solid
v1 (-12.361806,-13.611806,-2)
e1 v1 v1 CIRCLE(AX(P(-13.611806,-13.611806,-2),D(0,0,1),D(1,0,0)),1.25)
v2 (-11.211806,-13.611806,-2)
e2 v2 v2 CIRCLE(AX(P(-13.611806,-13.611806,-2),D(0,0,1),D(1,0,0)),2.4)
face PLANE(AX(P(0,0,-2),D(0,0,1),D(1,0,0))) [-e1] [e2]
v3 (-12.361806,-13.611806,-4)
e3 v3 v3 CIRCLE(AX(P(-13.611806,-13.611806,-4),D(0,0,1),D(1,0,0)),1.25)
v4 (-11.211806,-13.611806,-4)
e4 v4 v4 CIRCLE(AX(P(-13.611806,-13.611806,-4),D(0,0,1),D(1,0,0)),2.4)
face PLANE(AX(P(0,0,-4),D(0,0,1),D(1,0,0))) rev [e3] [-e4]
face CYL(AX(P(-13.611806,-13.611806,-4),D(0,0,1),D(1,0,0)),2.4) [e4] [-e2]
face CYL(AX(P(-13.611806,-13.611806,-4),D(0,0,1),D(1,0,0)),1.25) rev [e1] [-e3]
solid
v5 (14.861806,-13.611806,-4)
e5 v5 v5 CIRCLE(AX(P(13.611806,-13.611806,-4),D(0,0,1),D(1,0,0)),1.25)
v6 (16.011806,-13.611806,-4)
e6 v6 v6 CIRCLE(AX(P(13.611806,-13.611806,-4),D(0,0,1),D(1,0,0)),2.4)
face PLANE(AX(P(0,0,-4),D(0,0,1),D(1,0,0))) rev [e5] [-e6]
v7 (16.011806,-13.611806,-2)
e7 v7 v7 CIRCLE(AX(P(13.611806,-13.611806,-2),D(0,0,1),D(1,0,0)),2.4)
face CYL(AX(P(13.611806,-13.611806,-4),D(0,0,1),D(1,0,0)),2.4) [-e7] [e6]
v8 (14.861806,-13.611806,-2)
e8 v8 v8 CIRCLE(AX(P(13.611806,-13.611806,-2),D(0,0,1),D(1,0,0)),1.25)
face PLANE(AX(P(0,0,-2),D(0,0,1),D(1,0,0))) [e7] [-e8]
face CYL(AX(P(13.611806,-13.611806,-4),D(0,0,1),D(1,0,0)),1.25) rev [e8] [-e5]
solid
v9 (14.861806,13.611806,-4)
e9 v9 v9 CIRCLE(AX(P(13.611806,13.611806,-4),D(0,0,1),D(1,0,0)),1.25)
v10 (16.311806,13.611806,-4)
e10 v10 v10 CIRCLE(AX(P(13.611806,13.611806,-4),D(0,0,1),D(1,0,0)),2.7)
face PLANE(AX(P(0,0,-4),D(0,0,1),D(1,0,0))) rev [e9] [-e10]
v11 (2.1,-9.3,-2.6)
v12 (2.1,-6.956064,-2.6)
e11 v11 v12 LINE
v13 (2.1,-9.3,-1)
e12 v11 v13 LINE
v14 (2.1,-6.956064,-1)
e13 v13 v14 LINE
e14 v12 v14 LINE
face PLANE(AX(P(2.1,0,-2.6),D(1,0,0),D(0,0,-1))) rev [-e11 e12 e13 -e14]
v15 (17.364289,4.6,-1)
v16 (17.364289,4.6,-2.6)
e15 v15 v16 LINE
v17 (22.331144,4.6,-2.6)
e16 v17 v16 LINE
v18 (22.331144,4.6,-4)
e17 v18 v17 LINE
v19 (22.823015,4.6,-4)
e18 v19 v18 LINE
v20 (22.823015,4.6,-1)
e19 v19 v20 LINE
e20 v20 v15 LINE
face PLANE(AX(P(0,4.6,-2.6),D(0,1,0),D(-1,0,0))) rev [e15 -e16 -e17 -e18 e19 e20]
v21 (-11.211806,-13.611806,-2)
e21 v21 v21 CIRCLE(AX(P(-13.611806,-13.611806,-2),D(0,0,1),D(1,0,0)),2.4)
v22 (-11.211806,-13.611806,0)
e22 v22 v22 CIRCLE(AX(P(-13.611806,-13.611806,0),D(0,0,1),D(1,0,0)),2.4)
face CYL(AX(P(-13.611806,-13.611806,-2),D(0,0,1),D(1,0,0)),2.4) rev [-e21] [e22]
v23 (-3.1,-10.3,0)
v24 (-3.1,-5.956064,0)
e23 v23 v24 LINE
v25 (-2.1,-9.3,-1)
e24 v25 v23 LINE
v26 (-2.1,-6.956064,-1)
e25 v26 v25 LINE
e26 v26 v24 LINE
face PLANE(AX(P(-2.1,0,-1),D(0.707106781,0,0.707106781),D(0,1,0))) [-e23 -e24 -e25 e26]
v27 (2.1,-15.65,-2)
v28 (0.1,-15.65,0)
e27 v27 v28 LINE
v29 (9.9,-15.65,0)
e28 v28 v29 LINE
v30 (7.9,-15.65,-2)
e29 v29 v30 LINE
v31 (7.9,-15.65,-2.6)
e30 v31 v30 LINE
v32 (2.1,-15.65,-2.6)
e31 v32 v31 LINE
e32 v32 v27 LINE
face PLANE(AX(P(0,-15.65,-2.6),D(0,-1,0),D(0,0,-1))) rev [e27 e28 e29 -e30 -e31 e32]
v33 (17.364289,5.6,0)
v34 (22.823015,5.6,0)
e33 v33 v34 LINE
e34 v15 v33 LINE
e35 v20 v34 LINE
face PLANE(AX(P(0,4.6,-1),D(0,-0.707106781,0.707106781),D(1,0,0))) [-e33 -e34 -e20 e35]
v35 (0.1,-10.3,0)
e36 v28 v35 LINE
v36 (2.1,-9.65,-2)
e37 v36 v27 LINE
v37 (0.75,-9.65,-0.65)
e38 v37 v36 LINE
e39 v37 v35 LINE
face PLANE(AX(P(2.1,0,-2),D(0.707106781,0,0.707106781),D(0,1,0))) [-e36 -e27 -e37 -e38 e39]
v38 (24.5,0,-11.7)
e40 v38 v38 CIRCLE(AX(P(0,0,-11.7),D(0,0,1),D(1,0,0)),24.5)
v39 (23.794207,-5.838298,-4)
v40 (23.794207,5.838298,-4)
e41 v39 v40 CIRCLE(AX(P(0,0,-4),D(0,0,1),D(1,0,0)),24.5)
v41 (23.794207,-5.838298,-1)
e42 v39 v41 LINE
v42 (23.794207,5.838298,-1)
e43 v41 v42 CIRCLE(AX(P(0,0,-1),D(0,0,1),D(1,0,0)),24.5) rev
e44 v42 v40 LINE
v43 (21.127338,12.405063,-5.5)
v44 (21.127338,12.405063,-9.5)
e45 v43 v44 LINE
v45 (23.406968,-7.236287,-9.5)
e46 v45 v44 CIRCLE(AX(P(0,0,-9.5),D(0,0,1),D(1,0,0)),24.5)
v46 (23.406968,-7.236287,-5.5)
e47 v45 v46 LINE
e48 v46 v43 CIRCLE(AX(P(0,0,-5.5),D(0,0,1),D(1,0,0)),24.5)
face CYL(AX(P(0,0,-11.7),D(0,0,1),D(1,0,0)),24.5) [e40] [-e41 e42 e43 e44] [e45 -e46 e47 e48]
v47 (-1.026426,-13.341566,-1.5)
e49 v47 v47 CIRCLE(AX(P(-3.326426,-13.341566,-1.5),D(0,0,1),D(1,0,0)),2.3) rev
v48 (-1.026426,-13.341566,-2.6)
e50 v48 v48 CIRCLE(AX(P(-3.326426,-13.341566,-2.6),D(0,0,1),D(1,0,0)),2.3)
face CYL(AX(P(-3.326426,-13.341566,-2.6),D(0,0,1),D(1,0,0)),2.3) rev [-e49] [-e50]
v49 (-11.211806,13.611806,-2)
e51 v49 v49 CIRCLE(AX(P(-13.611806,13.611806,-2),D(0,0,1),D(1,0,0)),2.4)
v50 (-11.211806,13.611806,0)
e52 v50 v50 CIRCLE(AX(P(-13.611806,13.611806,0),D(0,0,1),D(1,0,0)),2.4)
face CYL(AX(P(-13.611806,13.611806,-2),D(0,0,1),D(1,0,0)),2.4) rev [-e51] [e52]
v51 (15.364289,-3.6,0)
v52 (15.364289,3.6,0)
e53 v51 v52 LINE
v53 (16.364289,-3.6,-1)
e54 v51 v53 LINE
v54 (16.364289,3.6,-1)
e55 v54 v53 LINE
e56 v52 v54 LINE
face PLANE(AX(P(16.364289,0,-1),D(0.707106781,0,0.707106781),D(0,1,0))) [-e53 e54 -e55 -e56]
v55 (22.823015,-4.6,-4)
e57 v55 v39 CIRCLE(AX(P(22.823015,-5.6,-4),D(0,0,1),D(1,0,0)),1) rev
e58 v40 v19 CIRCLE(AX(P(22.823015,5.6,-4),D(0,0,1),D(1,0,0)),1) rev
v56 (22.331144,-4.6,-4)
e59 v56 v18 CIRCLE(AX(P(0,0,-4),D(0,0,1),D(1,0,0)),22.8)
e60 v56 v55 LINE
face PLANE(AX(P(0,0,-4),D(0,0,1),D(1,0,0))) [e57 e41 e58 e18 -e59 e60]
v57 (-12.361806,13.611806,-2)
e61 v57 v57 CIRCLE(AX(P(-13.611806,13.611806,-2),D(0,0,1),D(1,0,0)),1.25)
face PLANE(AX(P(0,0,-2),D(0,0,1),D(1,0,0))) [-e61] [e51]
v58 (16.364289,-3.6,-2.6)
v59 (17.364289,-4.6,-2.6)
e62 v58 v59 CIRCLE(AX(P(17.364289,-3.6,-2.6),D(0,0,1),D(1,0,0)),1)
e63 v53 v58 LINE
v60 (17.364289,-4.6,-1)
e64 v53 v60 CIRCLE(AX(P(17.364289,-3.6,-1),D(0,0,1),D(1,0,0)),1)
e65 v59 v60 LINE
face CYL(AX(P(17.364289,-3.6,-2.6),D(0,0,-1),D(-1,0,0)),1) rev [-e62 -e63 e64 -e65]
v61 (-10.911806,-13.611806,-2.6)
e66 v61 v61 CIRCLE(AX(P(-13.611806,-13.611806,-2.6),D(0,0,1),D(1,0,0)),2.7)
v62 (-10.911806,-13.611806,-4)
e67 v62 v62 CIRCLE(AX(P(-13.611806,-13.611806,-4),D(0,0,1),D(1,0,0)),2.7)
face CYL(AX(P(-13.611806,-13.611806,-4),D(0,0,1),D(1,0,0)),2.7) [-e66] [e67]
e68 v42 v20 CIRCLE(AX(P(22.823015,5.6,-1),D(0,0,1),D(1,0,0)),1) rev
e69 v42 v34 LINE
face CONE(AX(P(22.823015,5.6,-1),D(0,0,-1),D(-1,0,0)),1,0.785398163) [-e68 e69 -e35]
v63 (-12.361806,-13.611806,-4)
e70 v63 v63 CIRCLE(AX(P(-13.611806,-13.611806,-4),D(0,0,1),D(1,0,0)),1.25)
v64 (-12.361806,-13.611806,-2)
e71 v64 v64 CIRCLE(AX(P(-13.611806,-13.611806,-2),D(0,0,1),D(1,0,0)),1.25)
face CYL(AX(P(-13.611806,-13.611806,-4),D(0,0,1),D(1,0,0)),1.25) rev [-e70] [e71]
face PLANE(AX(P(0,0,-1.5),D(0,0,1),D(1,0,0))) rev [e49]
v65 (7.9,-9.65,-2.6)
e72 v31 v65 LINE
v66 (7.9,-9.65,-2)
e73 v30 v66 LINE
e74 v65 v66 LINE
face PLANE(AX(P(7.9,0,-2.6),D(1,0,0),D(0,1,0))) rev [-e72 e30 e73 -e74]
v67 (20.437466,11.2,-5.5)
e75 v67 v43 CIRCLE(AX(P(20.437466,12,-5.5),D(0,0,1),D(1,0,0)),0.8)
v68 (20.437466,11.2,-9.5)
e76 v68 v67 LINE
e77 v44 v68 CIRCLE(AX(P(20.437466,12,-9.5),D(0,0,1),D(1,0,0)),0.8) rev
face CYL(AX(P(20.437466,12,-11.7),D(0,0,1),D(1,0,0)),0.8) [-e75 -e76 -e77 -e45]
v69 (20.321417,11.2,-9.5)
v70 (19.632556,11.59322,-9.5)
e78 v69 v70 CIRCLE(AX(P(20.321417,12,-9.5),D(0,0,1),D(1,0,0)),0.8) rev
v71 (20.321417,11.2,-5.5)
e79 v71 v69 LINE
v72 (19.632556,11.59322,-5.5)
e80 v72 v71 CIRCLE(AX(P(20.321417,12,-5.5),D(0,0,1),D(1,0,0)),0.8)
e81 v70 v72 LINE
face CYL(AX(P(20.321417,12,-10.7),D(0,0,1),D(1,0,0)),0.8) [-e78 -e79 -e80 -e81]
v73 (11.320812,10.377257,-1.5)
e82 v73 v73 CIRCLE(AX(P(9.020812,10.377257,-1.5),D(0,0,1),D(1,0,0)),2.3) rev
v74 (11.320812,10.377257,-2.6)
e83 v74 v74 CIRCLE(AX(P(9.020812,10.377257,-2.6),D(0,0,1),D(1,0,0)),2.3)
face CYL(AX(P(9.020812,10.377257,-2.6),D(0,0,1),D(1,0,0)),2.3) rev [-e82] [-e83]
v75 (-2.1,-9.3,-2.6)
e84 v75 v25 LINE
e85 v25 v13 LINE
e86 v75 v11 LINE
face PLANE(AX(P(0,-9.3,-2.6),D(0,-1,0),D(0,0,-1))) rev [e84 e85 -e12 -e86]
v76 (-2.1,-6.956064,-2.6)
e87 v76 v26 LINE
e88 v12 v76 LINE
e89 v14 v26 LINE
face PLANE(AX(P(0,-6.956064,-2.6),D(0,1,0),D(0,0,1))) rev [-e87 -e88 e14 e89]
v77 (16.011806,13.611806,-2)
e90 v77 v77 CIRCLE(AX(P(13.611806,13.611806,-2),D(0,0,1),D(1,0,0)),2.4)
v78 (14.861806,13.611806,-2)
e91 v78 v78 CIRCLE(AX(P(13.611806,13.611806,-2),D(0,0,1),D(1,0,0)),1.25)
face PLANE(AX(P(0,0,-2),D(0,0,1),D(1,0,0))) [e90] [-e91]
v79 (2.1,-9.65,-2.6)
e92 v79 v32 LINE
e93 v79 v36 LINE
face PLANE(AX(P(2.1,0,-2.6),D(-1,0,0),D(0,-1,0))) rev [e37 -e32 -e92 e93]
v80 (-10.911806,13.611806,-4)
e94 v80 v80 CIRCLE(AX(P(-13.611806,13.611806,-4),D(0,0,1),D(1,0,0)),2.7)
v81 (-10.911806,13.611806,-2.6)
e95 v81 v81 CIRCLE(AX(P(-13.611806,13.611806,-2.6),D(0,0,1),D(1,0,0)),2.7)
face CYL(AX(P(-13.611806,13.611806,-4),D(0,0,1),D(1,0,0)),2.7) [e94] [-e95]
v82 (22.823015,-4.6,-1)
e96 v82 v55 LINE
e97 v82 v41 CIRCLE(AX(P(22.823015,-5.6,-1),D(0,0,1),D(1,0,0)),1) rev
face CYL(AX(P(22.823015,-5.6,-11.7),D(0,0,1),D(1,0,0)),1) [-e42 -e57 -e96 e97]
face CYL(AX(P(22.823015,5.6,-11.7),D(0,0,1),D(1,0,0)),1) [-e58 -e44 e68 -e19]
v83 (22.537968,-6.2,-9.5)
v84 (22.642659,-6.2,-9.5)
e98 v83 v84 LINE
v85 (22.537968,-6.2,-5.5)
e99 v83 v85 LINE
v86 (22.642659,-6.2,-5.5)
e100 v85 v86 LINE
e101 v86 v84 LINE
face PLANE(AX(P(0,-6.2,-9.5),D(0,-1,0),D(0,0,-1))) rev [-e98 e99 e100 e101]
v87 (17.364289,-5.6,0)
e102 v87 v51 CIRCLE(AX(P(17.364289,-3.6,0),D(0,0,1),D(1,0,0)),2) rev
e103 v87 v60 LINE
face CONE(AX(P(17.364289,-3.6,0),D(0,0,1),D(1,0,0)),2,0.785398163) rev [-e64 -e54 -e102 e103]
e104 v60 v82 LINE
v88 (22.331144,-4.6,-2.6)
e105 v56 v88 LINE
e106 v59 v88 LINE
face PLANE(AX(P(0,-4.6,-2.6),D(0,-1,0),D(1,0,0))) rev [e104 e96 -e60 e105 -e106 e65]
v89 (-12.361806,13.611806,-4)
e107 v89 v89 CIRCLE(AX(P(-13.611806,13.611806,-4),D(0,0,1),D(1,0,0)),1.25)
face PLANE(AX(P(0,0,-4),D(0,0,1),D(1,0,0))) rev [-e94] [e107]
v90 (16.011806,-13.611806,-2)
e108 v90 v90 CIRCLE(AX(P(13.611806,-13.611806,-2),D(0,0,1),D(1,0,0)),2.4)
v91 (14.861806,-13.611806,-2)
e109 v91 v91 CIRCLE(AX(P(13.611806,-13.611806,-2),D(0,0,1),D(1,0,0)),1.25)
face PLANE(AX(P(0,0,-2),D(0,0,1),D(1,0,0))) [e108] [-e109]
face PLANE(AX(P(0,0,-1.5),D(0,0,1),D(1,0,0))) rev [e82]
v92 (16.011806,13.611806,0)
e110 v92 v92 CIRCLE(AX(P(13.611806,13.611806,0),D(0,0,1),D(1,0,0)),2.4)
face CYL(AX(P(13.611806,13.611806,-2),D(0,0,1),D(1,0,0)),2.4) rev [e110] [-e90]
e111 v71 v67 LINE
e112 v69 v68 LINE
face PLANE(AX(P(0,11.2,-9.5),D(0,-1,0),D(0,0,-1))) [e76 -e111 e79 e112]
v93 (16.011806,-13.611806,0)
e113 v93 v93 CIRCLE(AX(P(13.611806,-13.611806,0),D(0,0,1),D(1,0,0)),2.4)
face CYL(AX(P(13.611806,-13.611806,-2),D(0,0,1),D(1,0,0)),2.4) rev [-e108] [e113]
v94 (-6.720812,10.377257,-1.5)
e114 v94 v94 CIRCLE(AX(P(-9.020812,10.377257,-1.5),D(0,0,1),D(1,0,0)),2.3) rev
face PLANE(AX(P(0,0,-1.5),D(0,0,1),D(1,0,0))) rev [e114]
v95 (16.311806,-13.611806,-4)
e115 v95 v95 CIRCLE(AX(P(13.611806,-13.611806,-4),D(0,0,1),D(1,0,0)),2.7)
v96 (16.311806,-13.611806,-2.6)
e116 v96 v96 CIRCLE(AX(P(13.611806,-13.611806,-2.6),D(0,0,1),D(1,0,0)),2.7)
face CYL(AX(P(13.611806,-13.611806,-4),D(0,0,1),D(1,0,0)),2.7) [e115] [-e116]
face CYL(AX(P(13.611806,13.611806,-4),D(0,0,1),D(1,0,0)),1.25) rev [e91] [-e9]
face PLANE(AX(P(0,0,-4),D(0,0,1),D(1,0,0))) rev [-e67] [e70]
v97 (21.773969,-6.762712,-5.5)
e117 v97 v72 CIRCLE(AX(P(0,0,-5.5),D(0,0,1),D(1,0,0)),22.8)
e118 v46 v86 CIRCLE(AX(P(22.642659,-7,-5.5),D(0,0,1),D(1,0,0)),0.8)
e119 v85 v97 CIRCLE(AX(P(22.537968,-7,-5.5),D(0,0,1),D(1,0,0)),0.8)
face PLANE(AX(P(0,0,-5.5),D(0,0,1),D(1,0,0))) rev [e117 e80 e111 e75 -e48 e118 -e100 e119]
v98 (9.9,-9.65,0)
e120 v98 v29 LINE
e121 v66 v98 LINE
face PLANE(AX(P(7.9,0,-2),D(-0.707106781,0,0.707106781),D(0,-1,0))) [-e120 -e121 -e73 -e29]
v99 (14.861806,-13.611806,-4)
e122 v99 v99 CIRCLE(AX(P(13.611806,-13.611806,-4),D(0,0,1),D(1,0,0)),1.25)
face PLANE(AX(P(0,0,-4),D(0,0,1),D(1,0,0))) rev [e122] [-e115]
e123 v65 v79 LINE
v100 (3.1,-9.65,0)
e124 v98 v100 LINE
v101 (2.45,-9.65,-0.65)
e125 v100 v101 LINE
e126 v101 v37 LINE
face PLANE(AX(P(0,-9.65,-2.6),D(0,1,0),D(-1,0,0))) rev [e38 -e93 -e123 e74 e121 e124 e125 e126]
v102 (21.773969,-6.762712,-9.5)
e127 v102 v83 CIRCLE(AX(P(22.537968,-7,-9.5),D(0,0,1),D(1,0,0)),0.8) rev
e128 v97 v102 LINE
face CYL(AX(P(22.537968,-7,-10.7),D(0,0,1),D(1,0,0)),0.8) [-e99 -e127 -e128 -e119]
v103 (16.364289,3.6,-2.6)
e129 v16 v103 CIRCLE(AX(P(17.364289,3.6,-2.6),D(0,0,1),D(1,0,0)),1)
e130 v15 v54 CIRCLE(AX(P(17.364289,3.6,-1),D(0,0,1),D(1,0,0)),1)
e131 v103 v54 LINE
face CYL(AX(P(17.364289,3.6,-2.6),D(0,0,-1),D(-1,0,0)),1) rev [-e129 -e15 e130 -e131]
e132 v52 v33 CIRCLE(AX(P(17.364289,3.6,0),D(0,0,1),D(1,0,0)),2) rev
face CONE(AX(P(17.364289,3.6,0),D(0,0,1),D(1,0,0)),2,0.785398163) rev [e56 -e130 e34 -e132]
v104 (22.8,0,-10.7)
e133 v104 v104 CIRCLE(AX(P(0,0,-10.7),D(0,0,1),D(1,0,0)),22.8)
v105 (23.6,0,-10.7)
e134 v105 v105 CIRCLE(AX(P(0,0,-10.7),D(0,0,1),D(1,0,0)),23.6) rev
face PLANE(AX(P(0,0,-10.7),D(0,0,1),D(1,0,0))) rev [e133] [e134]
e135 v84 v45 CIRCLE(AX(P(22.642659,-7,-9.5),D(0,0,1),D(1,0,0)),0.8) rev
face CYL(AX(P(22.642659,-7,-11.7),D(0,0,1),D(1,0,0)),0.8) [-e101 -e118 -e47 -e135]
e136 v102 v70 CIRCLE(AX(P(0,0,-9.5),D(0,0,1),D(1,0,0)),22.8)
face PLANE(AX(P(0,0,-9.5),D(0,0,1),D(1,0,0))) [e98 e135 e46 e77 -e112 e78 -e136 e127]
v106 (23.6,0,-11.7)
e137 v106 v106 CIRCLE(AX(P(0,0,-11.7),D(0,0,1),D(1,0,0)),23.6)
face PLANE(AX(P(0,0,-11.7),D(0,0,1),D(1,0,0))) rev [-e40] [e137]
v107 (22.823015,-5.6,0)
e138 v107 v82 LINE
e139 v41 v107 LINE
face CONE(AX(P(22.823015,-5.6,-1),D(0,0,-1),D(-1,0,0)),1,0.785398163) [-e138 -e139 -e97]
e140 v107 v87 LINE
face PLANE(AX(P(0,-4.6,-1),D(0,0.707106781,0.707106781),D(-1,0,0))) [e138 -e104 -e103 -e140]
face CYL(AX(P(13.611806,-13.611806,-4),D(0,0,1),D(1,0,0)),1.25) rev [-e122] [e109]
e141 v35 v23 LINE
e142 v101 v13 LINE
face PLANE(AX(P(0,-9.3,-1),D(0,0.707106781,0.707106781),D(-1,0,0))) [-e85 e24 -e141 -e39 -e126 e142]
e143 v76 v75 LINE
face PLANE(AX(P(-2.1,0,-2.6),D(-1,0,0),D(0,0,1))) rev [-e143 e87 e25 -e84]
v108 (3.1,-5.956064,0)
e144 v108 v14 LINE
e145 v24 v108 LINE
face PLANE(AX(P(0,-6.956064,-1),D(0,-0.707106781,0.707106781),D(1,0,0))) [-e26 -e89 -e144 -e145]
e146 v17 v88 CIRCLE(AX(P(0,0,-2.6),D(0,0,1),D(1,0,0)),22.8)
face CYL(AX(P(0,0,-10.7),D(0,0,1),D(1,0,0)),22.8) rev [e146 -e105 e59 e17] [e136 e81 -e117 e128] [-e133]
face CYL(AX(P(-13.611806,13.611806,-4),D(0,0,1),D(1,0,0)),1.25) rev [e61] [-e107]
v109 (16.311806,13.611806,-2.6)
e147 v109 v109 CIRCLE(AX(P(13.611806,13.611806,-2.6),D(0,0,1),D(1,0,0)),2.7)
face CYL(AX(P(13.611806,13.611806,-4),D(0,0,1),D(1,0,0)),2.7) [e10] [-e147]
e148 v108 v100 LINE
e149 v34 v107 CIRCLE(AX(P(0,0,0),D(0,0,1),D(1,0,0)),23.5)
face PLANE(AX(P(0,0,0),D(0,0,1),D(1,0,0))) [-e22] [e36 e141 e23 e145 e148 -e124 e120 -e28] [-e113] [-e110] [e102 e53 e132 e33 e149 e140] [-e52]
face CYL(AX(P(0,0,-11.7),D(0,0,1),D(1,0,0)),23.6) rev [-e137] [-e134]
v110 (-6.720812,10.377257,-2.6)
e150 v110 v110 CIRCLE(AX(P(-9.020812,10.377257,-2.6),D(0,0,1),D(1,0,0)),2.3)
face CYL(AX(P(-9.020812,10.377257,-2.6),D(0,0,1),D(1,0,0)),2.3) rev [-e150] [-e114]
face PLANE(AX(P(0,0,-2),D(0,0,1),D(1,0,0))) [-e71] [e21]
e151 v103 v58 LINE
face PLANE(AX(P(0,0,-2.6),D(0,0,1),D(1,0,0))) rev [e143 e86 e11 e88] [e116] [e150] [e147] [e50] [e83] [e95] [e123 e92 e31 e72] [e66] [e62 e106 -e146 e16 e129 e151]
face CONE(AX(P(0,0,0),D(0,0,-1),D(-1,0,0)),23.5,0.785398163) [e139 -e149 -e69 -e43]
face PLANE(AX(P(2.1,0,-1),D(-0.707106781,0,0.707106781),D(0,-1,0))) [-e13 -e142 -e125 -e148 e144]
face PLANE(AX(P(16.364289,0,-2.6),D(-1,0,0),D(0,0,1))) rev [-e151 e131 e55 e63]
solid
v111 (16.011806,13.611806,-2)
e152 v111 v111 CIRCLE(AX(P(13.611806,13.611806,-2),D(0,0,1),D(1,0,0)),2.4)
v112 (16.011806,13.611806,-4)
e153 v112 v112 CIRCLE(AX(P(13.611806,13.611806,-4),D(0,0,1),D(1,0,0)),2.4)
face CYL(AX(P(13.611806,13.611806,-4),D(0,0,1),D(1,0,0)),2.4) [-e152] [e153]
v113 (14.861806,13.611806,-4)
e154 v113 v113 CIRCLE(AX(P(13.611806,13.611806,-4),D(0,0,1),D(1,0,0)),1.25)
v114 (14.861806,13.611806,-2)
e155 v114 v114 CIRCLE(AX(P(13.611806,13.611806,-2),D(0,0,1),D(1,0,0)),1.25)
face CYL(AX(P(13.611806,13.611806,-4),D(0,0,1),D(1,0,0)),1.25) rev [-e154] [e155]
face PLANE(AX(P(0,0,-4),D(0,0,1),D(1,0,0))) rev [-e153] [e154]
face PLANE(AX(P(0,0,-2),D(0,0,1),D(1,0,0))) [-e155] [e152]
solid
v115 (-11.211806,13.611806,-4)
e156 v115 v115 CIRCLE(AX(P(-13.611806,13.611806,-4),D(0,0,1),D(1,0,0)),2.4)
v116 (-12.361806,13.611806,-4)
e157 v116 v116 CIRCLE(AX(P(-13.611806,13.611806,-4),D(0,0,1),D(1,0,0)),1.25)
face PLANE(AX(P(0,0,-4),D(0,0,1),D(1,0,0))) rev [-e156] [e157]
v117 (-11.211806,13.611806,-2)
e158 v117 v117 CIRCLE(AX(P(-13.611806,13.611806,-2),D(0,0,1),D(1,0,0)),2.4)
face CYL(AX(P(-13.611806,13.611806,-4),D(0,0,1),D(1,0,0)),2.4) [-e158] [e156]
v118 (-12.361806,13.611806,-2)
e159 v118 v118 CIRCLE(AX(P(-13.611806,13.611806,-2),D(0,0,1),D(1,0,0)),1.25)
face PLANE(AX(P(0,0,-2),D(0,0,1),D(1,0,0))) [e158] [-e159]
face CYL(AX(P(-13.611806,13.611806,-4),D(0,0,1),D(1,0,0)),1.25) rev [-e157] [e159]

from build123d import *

# Parameters (mm, degrees)
SKETCH_2_R          = 24.5
SKETCH_2_R_2        = 23.6
EXTRUDE_3_DEPTH     = 11.7
SKETCH_2_5_R        = 23.6
SKETCH_2_5_R_2      = 22.8
EXTRUDE_4_DEPTH     = 10.7
SKETCH_2_6_R        = 2.7
SKETCH_2_6_R_2      = 2.3
SKETCH_2_6_W        = 5.8
SKETCH_2_6_H        = 6
SKETCH_2_6_W_2      = 4.2
SKETCH_2_6_H_2      = 2.343935591
EXTRUDE_5_DEPTH     = 2.6
SKETCH_2_7_R        = 2.4
SKETCH_2_7_R_2      = 1.25
EXTRUDE_6_DEPTH     = 4
EXTRUDE_6_2_DEPTH   = 4
EXTRUDE_6_3_DEPTH   = 4
EXTRUDE_6_4_DEPTH   = 4
SKETCH_2_20_R       = 2.3
EXTRUDE_10_DEPTH    = 1.5
SKETCH_2_9_R        = 2.7
SKETCH_2_9_R_2      = 1.25
SKETCH_2_9_R_3      = 2.4
EXTRUDE_7_DEPTH     = 4
CUT_EXTRUDE_2_DEPTH = 9.5
SKETCH_2_18_R       = 2.4
SKETCH_2_18_R_2     = 1.25
CUT_EXTRUDE_3_DEPTH = 2
SKETCH_2_14_R       = 24.5
SKETCH_2_14_R_2     = 22.8
EXTRUDE_9_DEPTH     = 5.5
CUT_EXTRUDE_4_DEPTH = 4
FILLET_2_R          = 0.8
FILLET_3_R          = 0.8
FILLET_4_R          = 0.8
FILLET_5_R          = 0.8
CHAMFER_1_SIZE      = 2
FILLET_6_R          = 1
CHAMFER_5_SIZE      = 1


with BuildPart() as part:
    # 草图2 → 凸台-拉伸3 (new body)
    with BuildSketch(Plane.XY):
        Circle(SKETCH_2_R)
        Circle(SKETCH_2_R_2, mode=Mode.SUBTRACT)
    extrude(amount=-EXTRUDE_3_DEPTH)

    # 草图2<5> → 凸台-拉伸4 (add)
    with BuildSketch(Plane.XY):
        Circle(SKETCH_2_5_R)
        Circle(SKETCH_2_5_R_2, mode=Mode.SUBTRACT)
    extrude(amount=-EXTRUDE_4_DEPTH)

    # 草图2<6> → 凸台-拉伸5 (add)
    with BuildSketch(Plane.XY):
        with BuildLine():
            Line((16.364288895, 4.6), (22.331144171, 4.6))
            ThreePointArc((22.331144171, 4.6), (21.351879352, 7.996077047), (19.85950654, 11.2))
            ThreePointArc((19.85950654, 11.2), (-22.638617972, -2.707946886), (21.940829519, -6.2))
            ThreePointArc((21.940829519, -6.2), (22.150438226, -5.403525366), (22.331144171, -4.6))
            Line((22.331144171, -4.6), (16.364288895, -4.6))
            Line((16.364288895, -4.6), (16.364288895, 4.6))
        make_face()
        with Locations((-13.611805538, -13.611805538)):
            Circle(SKETCH_2_6_R, mode=Mode.SUBTRACT)
        with Locations((-3.326426064, -13.341566236)):
            Circle(SKETCH_2_6_R_2, mode=Mode.SUBTRACT)
        with Locations((5, -12.65)):
            Rectangle(SKETCH_2_6_W, SKETCH_2_6_H, mode=Mode.SUBTRACT)
        with Locations((13.611805538, -13.611805538)):
            Circle(SKETCH_2_6_R, mode=Mode.SUBTRACT)
        with Locations((0, -8.128032205)):
            Rectangle(SKETCH_2_6_W_2, SKETCH_2_6_H_2, mode=Mode.SUBTRACT)
        with Locations((-9.020811649, 10.377256728)):
            Circle(SKETCH_2_6_R_2, mode=Mode.SUBTRACT)
        with Locations((-13.611805538, 13.611805538)):
            Circle(SKETCH_2_6_R, mode=Mode.SUBTRACT)
        with Locations((9.020811649, 10.377256728)):
            Circle(SKETCH_2_6_R_2, mode=Mode.SUBTRACT)
        with Locations((13.611805538, 13.611805538)):
            Circle(SKETCH_2_6_R, mode=Mode.SUBTRACT)
    extrude(amount=-EXTRUDE_5_DEPTH)

    # 草图2<20> → 凸台-拉伸10 (add)
    with BuildSketch(Plane.XY):
        with Locations((-9.020811649, 10.377256728)):
            Circle(SKETCH_2_20_R)
        with Locations((9.020811649, 10.377256728)):
            Circle(SKETCH_2_20_R)
        with Locations((-3.326426064, -13.341566236)):
            Circle(SKETCH_2_20_R)
    extrude(amount=-EXTRUDE_10_DEPTH)

    # 草图2<9> → 凸台-拉伸7 (add)
    # profile 1 of 8: a face of its own
    with BuildSketch(Plane.XY):
        with Locations((-13.611805538, 13.611805538)):
            Circle(SKETCH_2_9_R)
        with Locations((-13.611805538, 13.611805538)):
            Circle(SKETCH_2_9_R_2, mode=Mode.SUBTRACT)
    # profile 2 of 8: a face of its own
    with BuildSketch(Plane.XY):
        with Locations((13.611805538, 13.611805538)):
            Circle(SKETCH_2_9_R)
        with Locations((13.611805538, 13.611805538)):
            Circle(SKETCH_2_9_R_2, mode=Mode.SUBTRACT)
    # profile 3 of 8: a face of its own
    with BuildSketch(Plane.XY):
        with Locations((-13.611805538, 13.611805538)):
            Circle(SKETCH_2_9_R)
        with Locations((-13.611805538, 13.611805538)):
            Circle(SKETCH_2_9_R_3, mode=Mode.SUBTRACT)
    # profile 4 of 8: a face of its own
    with BuildSketch(Plane.XY):
        with Locations((13.611805538, 13.611805538)):
            Circle(SKETCH_2_9_R)
        with Locations((13.611805538, 13.611805538)):
            Circle(SKETCH_2_9_R_3, mode=Mode.SUBTRACT)
    # profile 5 of 8: a face of its own
    with BuildSketch(Plane.XY):
        with Locations((13.611805538, -13.611805538)):
            Circle(SKETCH_2_9_R)
        with Locations((13.611805538, -13.611805538)):
            Circle(SKETCH_2_9_R_3, mode=Mode.SUBTRACT)
    # profile 6 of 8: a face of its own
    with BuildSketch(Plane.XY):
        with Locations((-13.611805538, -13.611805538)):
            Circle(SKETCH_2_9_R)
        with Locations((-13.611805538, -13.611805538)):
            Circle(SKETCH_2_9_R_3, mode=Mode.SUBTRACT)
    # profile 7 of 8: a face of its own
    with BuildSketch(Plane.XY):
        with Locations((-13.611805538, -13.611805538)):
            Circle(SKETCH_2_9_R_3)
        with Locations((-13.611805538, -13.611805538)):
            Circle(SKETCH_2_9_R_2, mode=Mode.SUBTRACT)
    # profile 8 of 8: a face of its own
    with BuildSketch(Plane.XY):
        with Locations((13.611805538, -13.611805538)):
            Circle(SKETCH_2_9_R_3)
        with Locations((13.611805538, -13.611805538)):
            Circle(SKETCH_2_9_R_2, mode=Mode.SUBTRACT)
    extrude(amount=-EXTRUDE_7_DEPTH)

    # 草图2<13> → 切除-拉伸2 (cut)
    with BuildSketch(Plane.XY):
        with BuildLine():
            Line((21.790135383, 11.2), (19.85950654, 11.2))
            ThreePointArc((19.85950654, 11.2), (22.638617972, 2.707946886), (21.940829519, -6.2))
            Line((21.940829519, -6.2), (23.70253151, -6.2))
            ThreePointArc((23.70253151, -6.2), (24.353350596, 2.676623757), (21.790135383, 11.2))
        make_face()
    extrude(amount=-CUT_EXTRUDE_2_DEPTH, mode=Mode.SUBTRACT)


with BuildPart() as body_2:
    # 草图2<7> → 凸台-拉伸6 (new body)
    with BuildSketch(Plane.XY):
        with Locations((13.611805538, 13.611805538)):
            Circle(SKETCH_2_7_R)
        with Locations((13.611805538, 13.611805538)):
            Circle(SKETCH_2_7_R_2, mode=Mode.SUBTRACT)
    extrude(amount=-EXTRUDE_6_DEPTH)


with BuildPart() as body_3:
    # 草图2<7> → Extrude 6 2 (new body)
    with BuildSketch(Plane.XY):
        with Locations((-13.611805538, 13.611805538)):
            Circle(SKETCH_2_7_R)
        with Locations((-13.611805538, 13.611805538)):
            Circle(SKETCH_2_7_R_2, mode=Mode.SUBTRACT)
    extrude(amount=-EXTRUDE_6_2_DEPTH)


with BuildPart() as body_4:
    # 草图2<7> → Extrude 6 3 (new body)
    with BuildSketch(Plane.XY):
        with Locations((13.611805538, -13.611805538)):
            Circle(SKETCH_2_7_R)
        with Locations((13.611805538, -13.611805538)):
            Circle(SKETCH_2_7_R_2, mode=Mode.SUBTRACT)
    extrude(amount=-EXTRUDE_6_3_DEPTH)


with BuildPart() as body_5:
    # 草图2<7> → Extrude 6 4 (new body)
    with BuildSketch(Plane.XY):
        with Locations((-13.611805538, -13.611805538)):
            Circle(SKETCH_2_7_R)
        with Locations((-13.611805538, -13.611805538)):
            Circle(SKETCH_2_7_R_2, mode=Mode.SUBTRACT)
    extrude(amount=-EXTRUDE_6_4_DEPTH)


with BuildPart() as cut_extrude_3_tool:
    # 草图2<18> → 切除-拉伸3 (new body)
    # profile 1 of 4: a face of its own
    with BuildSketch(Plane.XY):
        with Locations((13.611805538, 13.611805538)):
            Circle(SKETCH_2_18_R)
        with Locations((13.611805538, 13.611805538)):
            Circle(SKETCH_2_18_R_2, mode=Mode.SUBTRACT)
    # profile 2 of 4: a face of its own
    with BuildSketch(Plane.XY):
        with Locations((13.611805538, -13.611805538)):
            Circle(SKETCH_2_18_R)
        with Locations((13.611805538, -13.611805538)):
            Circle(SKETCH_2_18_R_2, mode=Mode.SUBTRACT)
    # profile 3 of 4: a face of its own
    with BuildSketch(Plane.XY):
        with Locations((-13.611805538, -13.611805538)):
            Circle(SKETCH_2_18_R)
        with Locations((-13.611805538, -13.611805538)):
            Circle(SKETCH_2_18_R_2, mode=Mode.SUBTRACT)
    # profile 4 of 4: a face of its own
    with BuildSketch(Plane.XY):
        with Locations((-13.611805538, 13.611805538)):
            Circle(SKETCH_2_18_R)
        with Locations((-13.611805538, 13.611805538)):
            Circle(SKETCH_2_18_R_2, mode=Mode.SUBTRACT)
    extrude(amount=-CUT_EXTRUDE_3_DEPTH)


with BuildPart() as part_1:
    add(part.part)

    # 切除-拉伸3: cut by cut_extrude_3_tool
    add(cut_extrude_3_tool.part, mode=Mode.SUBTRACT)

    # 草图2<14> → 凸台-拉伸9 (add)
    with BuildSketch(Plane.XY):
        Circle(SKETCH_2_14_R)
        Circle(SKETCH_2_14_R_2, mode=Mode.SUBTRACT)
    extrude(amount=-EXTRUDE_9_DEPTH)

    # 草图2<19> → 切除-拉伸4 (cut)
    with BuildSketch(Plane.XY):
        with BuildLine():
            ThreePointArc((23.6, 0), (23.486565903, 2.311108411), (23.14735406, 4.6))
            Line((23.14735406, 4.6), (22.331144171, 4.6))
            ThreePointArc((22.331144171, 4.6), (22.682483188, 2.311916185), (22.8, 0))
            ThreePointArc((22.8, 0), (22.682483188, -2.311916185), (22.331144171, -4.6))
            Line((22.331144171, -4.6), (23.14735406, -4.6))
            ThreePointArc((23.14735406, -4.6), (23.486565903, -2.311108411), (23.6, 0))
        make_face()
        with BuildLine():
            ThreePointArc((24.5, 0), (24.390828993, 2.310294579), (24.064288895, 4.6))
            Line((24.064288895, 4.6), (23.14735406, 4.6))
            ThreePointArc((23.14735406, 4.6), (23.486565903, 2.311108411), (23.6, 0))
            ThreePointArc((23.6, 0), (23.486565903, -2.311108411), (23.14735406, -4.6))
            Line((23.14735406, -4.6), (24.064288895, -4.6))
            ThreePointArc((24.064288895, -4.6), (24.390828993, -2.310294579), (24.5, 0))
        make_face()
    extrude(amount=-CUT_EXTRUDE_4_DEPTH, mode=Mode.SUBTRACT)

    # 圆角2
    fillet_2_edges = [part_1.edges().sort_by_distance(p)[0] for p in [
        (21.790135383, 11.2, -7.5),
    ]]
    fillet(fillet_2_edges, radius=FILLET_2_R)

    # 圆角3
    fillet_3_edges = [part_1.edges().sort_by_distance(p)[0] for p in [
        (23.70253151, -6.2, -7.5),
    ]]
    fillet(fillet_3_edges, radius=FILLET_3_R)

    # 圆角4
    fillet_4_edges = [part_1.edges().sort_by_distance(p)[0] for p in [
        (21.940829519, -6.2, -7.5),
    ]]
    fillet(fillet_4_edges, radius=FILLET_4_R)

    # 圆角5
    fillet_5_edges = [part_1.edges().sort_by_distance(p)[0] for p in [
        (19.85950654, 11.2, -7.5),
    ]]
    fillet(fillet_5_edges, radius=FILLET_5_R)

    # 倒角1
    chamfer_1_edges = [part_1.edges().sort_by_distance(p)[0] for p in [
        (2.1, -12.65, 0),
        (7.9, -12.65, 0),
    ]]
    chamfer(chamfer_1_edges, length=CHAMFER_1_SIZE)

    # 倒角4
    # the kernel refuses this chamfer: 1 mm, written as the material it takes off along each edge
    with BuildSketch(Plane(origin=(-2.1, -6.956064409, 0), x_dir=(0, 0.9996219169112968, 0.027495876610586365), z_dir=(1, 0, 0)), Plane(origin=(2.1, -9.3, 0), x_dir=(0, -0.9996219169112968, 0.02749587661058639), z_dir=(-1, 0, 0))) as chamfer_4_piece_1:
        with BuildLine():
            Line((1.028673195, 0), (-0.056547155, -1.027117794))
            Line((-0.056547155, -1.027117794), (-0.076539593, -1.026567876))
            ThreePointArc((-0.076539593, -1.026567876), (-0.034129227, -0.51339783), (-0.019992438, 0.000549918))
            Line((-0.019992438, 0.000549918), (0.000549918, 0.019992438))
            ThreePointArc((0.000549918, 0.019992438), (0.514497665, 0.00585565), (1.029223113, 0.019992438))
            Line((1.029223113, 0.019992438), (1.028673195, 0))
        make_face()
    extrude(amount=4.2, mode=Mode.SUBTRACT)
    with BuildSketch(Plane(origin=(-2.1, -9.3, 0), x_dir=(-0.9996219169112968, 0, 0.027495876610586365), z_dir=(0, 1, 0)), Plane(origin=(2.1, -6.956064409, 0), x_dir=(0.9996219169112968, 0, 0.027495876610586365), z_dir=(0, -1, 0))) as chamfer_4_piece_2:
        with BuildLine():
            Line((1.028673195, 0), (-0.056547155, -1.027117794))
            Line((-0.056547155, -1.027117794), (-0.076539593, -1.026567876))
            ThreePointArc((-0.076539593, -1.026567876), (-0.034129227, -0.51339783), (-0.019992438, 0.000549918))
            Line((-0.019992438, 0.000549918), (0.000549918, 0.019992438))
            ThreePointArc((0.000549918, 0.019992438), (0.514497665, 0.00585565), (1.029223113, 0.019992438))
            Line((1.029223113, 0.019992438), (1.028673195, 0))
        make_face()
    extrude(amount=2.343935591, mode=Mode.SUBTRACT)
    with BuildSketch(Plane(origin=(-2.1, -9.3, 0), x_dir=(-0.9996219169112968, 0, 0.027495876610586365), z_dir=(0, 1, 0))) as chamfer_4_piece_3a_section:
        with BuildLine():
            Line((1.028673195, 0), (-0.056547155, -1.027117794))
            Line((-0.056547155, -1.027117794), (-0.076539593, -1.026567876))
            ThreePointArc((-0.076539593, -1.026567876), (-0.034129227, -0.51339783), (-0.019992438, 0.000549918))
            Line((-0.019992438, 0.000549918), (0.000549918, 0.019992438))
            ThreePointArc((0.000549918, 0.019992438), (0.514497665, 0.00585565), (1.029223113, 0.019992438))
            Line((1.029223113, 0.019992438), (1.028673195, 0))
        make_face()
    chamfer_4_piece_3a = extrude(amount=4.915618579, mode=Mode.PRIVATE)
    chamfer_4_piece_3a = split(chamfer_4_piece_3a, bisect_by=Plane(origin=(-2.429793627, -6.956064409, -0.329793627), z_dir=(0, 1, 0)), keep=Keep.TOP, mode=Mode.PRIVATE)
    with BuildSketch(Plane(origin=(-4.671682988, -6.956064409, 0), x_dir=(0, 0.9996219169112968, 0.027495876610586365), z_dir=(1, 0, 0))) as chamfer_4_piece_3b_section:
        with BuildLine():
            Line((1.028673195, 0), (-0.056547155, -1.027117794))
            Line((-0.056547155, -1.027117794), (-0.076539593, -1.026567876))
            ThreePointArc((-0.076539593, -1.026567876), (-0.034129227, -0.51339783), (-0.019992438, 0.000549918))
            Line((-0.019992438, 0.000549918), (0.000549918, 0.019992438))
            ThreePointArc((0.000549918, 0.019992438), (0.514497665, 0.00585565), (1.029223113, 0.019992438))
            Line((1.029223113, 0.019992438), (1.028673195, 0))
        make_face()
    chamfer_4_piece_3b = extrude(amount=6.771682988, mode=Mode.PRIVATE)
    chamfer_4_piece_3b = split(chamfer_4_piece_3b, bisect_by=Plane(origin=(-2.1, -6.626270782, -0.329793627), z_dir=(-1, 0, 0)), keep=Keep.TOP, mode=Mode.PRIVATE)
    chamfer_4_piece_3 = chamfer_4_piece_3a & chamfer_4_piece_3b
    add(chamfer_4_piece_3, mode=Mode.SUBTRACT)
    with BuildSketch(Plane(origin=(-2.1, -6.956064409, 0), x_dir=(0, 0.9996219169112968, 0.027495876610586365), z_dir=(1, 0, 0))) as chamfer_4_piece_4a_section:
        with BuildLine():
            Line((1.028673195, 0), (-0.056547155, -1.027117794))
            Line((-0.056547155, -1.027117794), (-0.076539593, -1.026567876))
            ThreePointArc((-0.076539593, -1.026567876), (-0.034129227, -0.51339783), (-0.019992438, 0.000549918))
            Line((-0.019992438, 0.000549918), (0.000549918, 0.019992438))
            ThreePointArc((0.000549918, 0.019992438), (0.514497665, 0.00585565), (1.029223113, 0.019992438))
            Line((1.029223113, 0.019992438), (1.028673195, 0))
        make_face()
    chamfer_4_piece_4a = extrude(amount=6.771682988, mode=Mode.PRIVATE)
    chamfer_4_piece_4a = split(chamfer_4_piece_4a, bisect_by=Plane(origin=(2.1, -6.626270782, -0.329793627), z_dir=(1, 0, 0)), keep=Keep.TOP, mode=Mode.PRIVATE)
    with BuildSketch(Plane(origin=(2.1, -4.384381421, 0), x_dir=(0.9996219169112968, 0, 0.027495876610586365), z_dir=(0, -1, 0))) as chamfer_4_piece_4b_section:
        with BuildLine():
            Line((1.028673195, 0), (-0.056547155, -1.027117794))
            Line((-0.056547155, -1.027117794), (-0.076539593, -1.026567876))
            ThreePointArc((-0.076539593, -1.026567876), (-0.034129227, -0.51339783), (-0.019992438, 0.000549918))
            Line((-0.019992438, 0.000549918), (0.000549918, 0.019992438))
            ThreePointArc((0.000549918, 0.019992438), (0.514497665, 0.00585565), (1.029223113, 0.019992438))
            Line((1.029223113, 0.019992438), (1.028673195, 0))
        make_face()
    chamfer_4_piece_4b = extrude(amount=4.915618579, mode=Mode.PRIVATE)
    chamfer_4_piece_4b = split(chamfer_4_piece_4b, bisect_by=Plane(origin=(2.429793627, -6.956064409, -0.329793627), z_dir=(0, 1, 0)), keep=Keep.TOP, mode=Mode.PRIVATE)
    chamfer_4_piece_4 = chamfer_4_piece_4a & chamfer_4_piece_4b
    add(chamfer_4_piece_4, mode=Mode.SUBTRACT)
    with BuildSketch(Plane(origin=(-2.1, -11.871682988, 0), x_dir=(-0.9996219169112968, 0, 0.027495876610586365), z_dir=(0, 1, 0))) as chamfer_4_piece_5a_section:
        with BuildLine():
            Line((1.028673195, 0), (-0.056547155, -1.027117794))
            Line((-0.056547155, -1.027117794), (-0.076539593, -1.026567876))
            ThreePointArc((-0.076539593, -1.026567876), (-0.034129227, -0.51339783), (-0.019992438, 0.000549918))
            Line((-0.019992438, 0.000549918), (0.000549918, 0.019992438))
            ThreePointArc((0.000549918, 0.019992438), (0.514497665, 0.00585565), (1.029223113, 0.019992438))
            Line((1.029223113, 0.019992438), (1.028673195, 0))
        make_face()
    chamfer_4_piece_5a = extrude(amount=4.915618579, mode=Mode.PRIVATE)
    chamfer_4_piece_5a = split(chamfer_4_piece_5a, bisect_by=Plane(origin=(-2.429793627, -9.3, -0.329793627), z_dir=(0, -1, 0)), keep=Keep.TOP, mode=Mode.PRIVATE)
    with BuildSketch(Plane(origin=(2.1, -9.3, 0), x_dir=(0, -0.9996219169112968, 0.02749587661058639), z_dir=(-1, 0, 0))) as chamfer_4_piece_5b_section:
        with BuildLine():
            Line((1.028673195, 0), (-0.056547155, -1.027117794))
            Line((-0.056547155, -1.027117794), (-0.076539593, -1.026567876))
            ThreePointArc((-0.076539593, -1.026567876), (-0.034129227, -0.51339783), (-0.019992438, 0.000549918))
            Line((-0.019992438, 0.000549918), (0.000549918, 0.019992438))
            ThreePointArc((0.000549918, 0.019992438), (0.514497665, 0.00585565), (1.029223113, 0.019992438))
            Line((1.029223113, 0.019992438), (1.028673195, 0))
        make_face()
    chamfer_4_piece_5b = extrude(amount=6.771682988, mode=Mode.PRIVATE)
    chamfer_4_piece_5b = split(chamfer_4_piece_5b, bisect_by=Plane(origin=(-2.1, -9.629793627, -0.329793627), z_dir=(-1, 0, 0)), keep=Keep.TOP, mode=Mode.PRIVATE)
    chamfer_4_piece_5 = chamfer_4_piece_5a & chamfer_4_piece_5b
    add(chamfer_4_piece_5, mode=Mode.SUBTRACT)
    with BuildSketch(Plane(origin=(2.1, -6.956064409, 0), x_dir=(0.9996219169112968, 0, 0.027495876610586365), z_dir=(0, -1, 0))) as chamfer_4_piece_6a_section:
        with BuildLine():
            Line((1.028673195, 0), (-0.056547155, -1.027117794))
            Line((-0.056547155, -1.027117794), (-0.076539593, -1.026567876))
            ThreePointArc((-0.076539593, -1.026567876), (-0.034129227, -0.51339783), (-0.019992438, 0.000549918))
            Line((-0.019992438, 0.000549918), (0.000549918, 0.019992438))
            ThreePointArc((0.000549918, 0.019992438), (0.514497665, 0.00585565), (1.029223113, 0.019992438))
            Line((1.029223113, 0.019992438), (1.028673195, 0))
        make_face()
    chamfer_4_piece_6a = extrude(amount=4.915618579, mode=Mode.PRIVATE)
    chamfer_4_piece_6a = split(chamfer_4_piece_6a, bisect_by=Plane(origin=(2.429793627, -9.3, -0.329793627), z_dir=(0, -1, 0)), keep=Keep.TOP, mode=Mode.PRIVATE)
    with BuildSketch(Plane(origin=(4.671682988, -9.3, 0), x_dir=(0, -0.9996219169112968, 0.02749587661058639), z_dir=(-1, 0, 0))) as chamfer_4_piece_6b_section:
        with BuildLine():
            Line((1.028673195, 0), (-0.056547155, -1.027117794))
            Line((-0.056547155, -1.027117794), (-0.076539593, -1.026567876))
            ThreePointArc((-0.076539593, -1.026567876), (-0.034129227, -0.51339783), (-0.019992438, 0.000549918))
            Line((-0.019992438, 0.000549918), (0.000549918, 0.019992438))
            ThreePointArc((0.000549918, 0.019992438), (0.514497665, 0.00585565), (1.029223113, 0.019992438))
            Line((1.029223113, 0.019992438), (1.028673195, 0))
        make_face()
    chamfer_4_piece_6b = extrude(amount=6.771682988, mode=Mode.PRIVATE)
    chamfer_4_piece_6b = split(chamfer_4_piece_6b, bisect_by=Plane(origin=(2.1, -9.629793627, -0.329793627), z_dir=(1, 0, 0)), keep=Keep.TOP, mode=Mode.PRIVATE)
    chamfer_4_piece_6 = chamfer_4_piece_6a & chamfer_4_piece_6b
    add(chamfer_4_piece_6, mode=Mode.SUBTRACT)

    # 圆角6
    fillet_6_edges = [part_1.edges().sort_by_distance(p)[0] for p in [
        (24.064288895, 4.6, -2),
        (24.064288895, -4.6, -2),
        (16.364288895, 4.6, -1.3),
        (16.364288895, -4.6, -1.3),
    ]]
    fillet(fillet_6_edges, radius=FILLET_6_R)

    # 倒角5
    chamfer_5_edges = [part_1.edges().sort_by_distance(p)[0] for p in [
        (20.093651797, 4.6, 0),
        (-24.5, 0, 0),
        (20.093651797, -4.6, 0),
        (16.364288895, 0, 0),
        (23.609874876, -4.982868682, 0),
        (23.609874876, 4.982868682, 0),
        (16.657182113, 4.307106781, 0),
        (16.657182113, -4.307106781, 0),
    ]]
    chamfer(chamfer_5_edges, length=CHAMFER_5_SIZE)


with BuildPart() as body_2_1:
    add(body_2.part)

    # 切除-拉伸3: cut by cut_extrude_3_tool
    add(cut_extrude_3_tool.part, mode=Mode.SUBTRACT)


with BuildPart() as body_3_1:
    add(body_3.part)

    # 切除-拉伸3: cut by cut_extrude_3_tool
    add(cut_extrude_3_tool.part, mode=Mode.SUBTRACT)


with BuildPart() as body_4_1:
    add(body_4.part)

    # 切除-拉伸3: cut by cut_extrude_3_tool
    add(cut_extrude_3_tool.part, mode=Mode.SUBTRACT)


with BuildPart() as body_5_1:
    add(body_5.part)

    # 切除-拉伸3: cut by cut_extrude_3_tool
    add(cut_extrude_3_tool.part, mode=Mode.SUBTRACT)


solid = Compound([part_1.part, body_2_1.part, body_3_1.part, body_4_1.part, body_5_1.part])
